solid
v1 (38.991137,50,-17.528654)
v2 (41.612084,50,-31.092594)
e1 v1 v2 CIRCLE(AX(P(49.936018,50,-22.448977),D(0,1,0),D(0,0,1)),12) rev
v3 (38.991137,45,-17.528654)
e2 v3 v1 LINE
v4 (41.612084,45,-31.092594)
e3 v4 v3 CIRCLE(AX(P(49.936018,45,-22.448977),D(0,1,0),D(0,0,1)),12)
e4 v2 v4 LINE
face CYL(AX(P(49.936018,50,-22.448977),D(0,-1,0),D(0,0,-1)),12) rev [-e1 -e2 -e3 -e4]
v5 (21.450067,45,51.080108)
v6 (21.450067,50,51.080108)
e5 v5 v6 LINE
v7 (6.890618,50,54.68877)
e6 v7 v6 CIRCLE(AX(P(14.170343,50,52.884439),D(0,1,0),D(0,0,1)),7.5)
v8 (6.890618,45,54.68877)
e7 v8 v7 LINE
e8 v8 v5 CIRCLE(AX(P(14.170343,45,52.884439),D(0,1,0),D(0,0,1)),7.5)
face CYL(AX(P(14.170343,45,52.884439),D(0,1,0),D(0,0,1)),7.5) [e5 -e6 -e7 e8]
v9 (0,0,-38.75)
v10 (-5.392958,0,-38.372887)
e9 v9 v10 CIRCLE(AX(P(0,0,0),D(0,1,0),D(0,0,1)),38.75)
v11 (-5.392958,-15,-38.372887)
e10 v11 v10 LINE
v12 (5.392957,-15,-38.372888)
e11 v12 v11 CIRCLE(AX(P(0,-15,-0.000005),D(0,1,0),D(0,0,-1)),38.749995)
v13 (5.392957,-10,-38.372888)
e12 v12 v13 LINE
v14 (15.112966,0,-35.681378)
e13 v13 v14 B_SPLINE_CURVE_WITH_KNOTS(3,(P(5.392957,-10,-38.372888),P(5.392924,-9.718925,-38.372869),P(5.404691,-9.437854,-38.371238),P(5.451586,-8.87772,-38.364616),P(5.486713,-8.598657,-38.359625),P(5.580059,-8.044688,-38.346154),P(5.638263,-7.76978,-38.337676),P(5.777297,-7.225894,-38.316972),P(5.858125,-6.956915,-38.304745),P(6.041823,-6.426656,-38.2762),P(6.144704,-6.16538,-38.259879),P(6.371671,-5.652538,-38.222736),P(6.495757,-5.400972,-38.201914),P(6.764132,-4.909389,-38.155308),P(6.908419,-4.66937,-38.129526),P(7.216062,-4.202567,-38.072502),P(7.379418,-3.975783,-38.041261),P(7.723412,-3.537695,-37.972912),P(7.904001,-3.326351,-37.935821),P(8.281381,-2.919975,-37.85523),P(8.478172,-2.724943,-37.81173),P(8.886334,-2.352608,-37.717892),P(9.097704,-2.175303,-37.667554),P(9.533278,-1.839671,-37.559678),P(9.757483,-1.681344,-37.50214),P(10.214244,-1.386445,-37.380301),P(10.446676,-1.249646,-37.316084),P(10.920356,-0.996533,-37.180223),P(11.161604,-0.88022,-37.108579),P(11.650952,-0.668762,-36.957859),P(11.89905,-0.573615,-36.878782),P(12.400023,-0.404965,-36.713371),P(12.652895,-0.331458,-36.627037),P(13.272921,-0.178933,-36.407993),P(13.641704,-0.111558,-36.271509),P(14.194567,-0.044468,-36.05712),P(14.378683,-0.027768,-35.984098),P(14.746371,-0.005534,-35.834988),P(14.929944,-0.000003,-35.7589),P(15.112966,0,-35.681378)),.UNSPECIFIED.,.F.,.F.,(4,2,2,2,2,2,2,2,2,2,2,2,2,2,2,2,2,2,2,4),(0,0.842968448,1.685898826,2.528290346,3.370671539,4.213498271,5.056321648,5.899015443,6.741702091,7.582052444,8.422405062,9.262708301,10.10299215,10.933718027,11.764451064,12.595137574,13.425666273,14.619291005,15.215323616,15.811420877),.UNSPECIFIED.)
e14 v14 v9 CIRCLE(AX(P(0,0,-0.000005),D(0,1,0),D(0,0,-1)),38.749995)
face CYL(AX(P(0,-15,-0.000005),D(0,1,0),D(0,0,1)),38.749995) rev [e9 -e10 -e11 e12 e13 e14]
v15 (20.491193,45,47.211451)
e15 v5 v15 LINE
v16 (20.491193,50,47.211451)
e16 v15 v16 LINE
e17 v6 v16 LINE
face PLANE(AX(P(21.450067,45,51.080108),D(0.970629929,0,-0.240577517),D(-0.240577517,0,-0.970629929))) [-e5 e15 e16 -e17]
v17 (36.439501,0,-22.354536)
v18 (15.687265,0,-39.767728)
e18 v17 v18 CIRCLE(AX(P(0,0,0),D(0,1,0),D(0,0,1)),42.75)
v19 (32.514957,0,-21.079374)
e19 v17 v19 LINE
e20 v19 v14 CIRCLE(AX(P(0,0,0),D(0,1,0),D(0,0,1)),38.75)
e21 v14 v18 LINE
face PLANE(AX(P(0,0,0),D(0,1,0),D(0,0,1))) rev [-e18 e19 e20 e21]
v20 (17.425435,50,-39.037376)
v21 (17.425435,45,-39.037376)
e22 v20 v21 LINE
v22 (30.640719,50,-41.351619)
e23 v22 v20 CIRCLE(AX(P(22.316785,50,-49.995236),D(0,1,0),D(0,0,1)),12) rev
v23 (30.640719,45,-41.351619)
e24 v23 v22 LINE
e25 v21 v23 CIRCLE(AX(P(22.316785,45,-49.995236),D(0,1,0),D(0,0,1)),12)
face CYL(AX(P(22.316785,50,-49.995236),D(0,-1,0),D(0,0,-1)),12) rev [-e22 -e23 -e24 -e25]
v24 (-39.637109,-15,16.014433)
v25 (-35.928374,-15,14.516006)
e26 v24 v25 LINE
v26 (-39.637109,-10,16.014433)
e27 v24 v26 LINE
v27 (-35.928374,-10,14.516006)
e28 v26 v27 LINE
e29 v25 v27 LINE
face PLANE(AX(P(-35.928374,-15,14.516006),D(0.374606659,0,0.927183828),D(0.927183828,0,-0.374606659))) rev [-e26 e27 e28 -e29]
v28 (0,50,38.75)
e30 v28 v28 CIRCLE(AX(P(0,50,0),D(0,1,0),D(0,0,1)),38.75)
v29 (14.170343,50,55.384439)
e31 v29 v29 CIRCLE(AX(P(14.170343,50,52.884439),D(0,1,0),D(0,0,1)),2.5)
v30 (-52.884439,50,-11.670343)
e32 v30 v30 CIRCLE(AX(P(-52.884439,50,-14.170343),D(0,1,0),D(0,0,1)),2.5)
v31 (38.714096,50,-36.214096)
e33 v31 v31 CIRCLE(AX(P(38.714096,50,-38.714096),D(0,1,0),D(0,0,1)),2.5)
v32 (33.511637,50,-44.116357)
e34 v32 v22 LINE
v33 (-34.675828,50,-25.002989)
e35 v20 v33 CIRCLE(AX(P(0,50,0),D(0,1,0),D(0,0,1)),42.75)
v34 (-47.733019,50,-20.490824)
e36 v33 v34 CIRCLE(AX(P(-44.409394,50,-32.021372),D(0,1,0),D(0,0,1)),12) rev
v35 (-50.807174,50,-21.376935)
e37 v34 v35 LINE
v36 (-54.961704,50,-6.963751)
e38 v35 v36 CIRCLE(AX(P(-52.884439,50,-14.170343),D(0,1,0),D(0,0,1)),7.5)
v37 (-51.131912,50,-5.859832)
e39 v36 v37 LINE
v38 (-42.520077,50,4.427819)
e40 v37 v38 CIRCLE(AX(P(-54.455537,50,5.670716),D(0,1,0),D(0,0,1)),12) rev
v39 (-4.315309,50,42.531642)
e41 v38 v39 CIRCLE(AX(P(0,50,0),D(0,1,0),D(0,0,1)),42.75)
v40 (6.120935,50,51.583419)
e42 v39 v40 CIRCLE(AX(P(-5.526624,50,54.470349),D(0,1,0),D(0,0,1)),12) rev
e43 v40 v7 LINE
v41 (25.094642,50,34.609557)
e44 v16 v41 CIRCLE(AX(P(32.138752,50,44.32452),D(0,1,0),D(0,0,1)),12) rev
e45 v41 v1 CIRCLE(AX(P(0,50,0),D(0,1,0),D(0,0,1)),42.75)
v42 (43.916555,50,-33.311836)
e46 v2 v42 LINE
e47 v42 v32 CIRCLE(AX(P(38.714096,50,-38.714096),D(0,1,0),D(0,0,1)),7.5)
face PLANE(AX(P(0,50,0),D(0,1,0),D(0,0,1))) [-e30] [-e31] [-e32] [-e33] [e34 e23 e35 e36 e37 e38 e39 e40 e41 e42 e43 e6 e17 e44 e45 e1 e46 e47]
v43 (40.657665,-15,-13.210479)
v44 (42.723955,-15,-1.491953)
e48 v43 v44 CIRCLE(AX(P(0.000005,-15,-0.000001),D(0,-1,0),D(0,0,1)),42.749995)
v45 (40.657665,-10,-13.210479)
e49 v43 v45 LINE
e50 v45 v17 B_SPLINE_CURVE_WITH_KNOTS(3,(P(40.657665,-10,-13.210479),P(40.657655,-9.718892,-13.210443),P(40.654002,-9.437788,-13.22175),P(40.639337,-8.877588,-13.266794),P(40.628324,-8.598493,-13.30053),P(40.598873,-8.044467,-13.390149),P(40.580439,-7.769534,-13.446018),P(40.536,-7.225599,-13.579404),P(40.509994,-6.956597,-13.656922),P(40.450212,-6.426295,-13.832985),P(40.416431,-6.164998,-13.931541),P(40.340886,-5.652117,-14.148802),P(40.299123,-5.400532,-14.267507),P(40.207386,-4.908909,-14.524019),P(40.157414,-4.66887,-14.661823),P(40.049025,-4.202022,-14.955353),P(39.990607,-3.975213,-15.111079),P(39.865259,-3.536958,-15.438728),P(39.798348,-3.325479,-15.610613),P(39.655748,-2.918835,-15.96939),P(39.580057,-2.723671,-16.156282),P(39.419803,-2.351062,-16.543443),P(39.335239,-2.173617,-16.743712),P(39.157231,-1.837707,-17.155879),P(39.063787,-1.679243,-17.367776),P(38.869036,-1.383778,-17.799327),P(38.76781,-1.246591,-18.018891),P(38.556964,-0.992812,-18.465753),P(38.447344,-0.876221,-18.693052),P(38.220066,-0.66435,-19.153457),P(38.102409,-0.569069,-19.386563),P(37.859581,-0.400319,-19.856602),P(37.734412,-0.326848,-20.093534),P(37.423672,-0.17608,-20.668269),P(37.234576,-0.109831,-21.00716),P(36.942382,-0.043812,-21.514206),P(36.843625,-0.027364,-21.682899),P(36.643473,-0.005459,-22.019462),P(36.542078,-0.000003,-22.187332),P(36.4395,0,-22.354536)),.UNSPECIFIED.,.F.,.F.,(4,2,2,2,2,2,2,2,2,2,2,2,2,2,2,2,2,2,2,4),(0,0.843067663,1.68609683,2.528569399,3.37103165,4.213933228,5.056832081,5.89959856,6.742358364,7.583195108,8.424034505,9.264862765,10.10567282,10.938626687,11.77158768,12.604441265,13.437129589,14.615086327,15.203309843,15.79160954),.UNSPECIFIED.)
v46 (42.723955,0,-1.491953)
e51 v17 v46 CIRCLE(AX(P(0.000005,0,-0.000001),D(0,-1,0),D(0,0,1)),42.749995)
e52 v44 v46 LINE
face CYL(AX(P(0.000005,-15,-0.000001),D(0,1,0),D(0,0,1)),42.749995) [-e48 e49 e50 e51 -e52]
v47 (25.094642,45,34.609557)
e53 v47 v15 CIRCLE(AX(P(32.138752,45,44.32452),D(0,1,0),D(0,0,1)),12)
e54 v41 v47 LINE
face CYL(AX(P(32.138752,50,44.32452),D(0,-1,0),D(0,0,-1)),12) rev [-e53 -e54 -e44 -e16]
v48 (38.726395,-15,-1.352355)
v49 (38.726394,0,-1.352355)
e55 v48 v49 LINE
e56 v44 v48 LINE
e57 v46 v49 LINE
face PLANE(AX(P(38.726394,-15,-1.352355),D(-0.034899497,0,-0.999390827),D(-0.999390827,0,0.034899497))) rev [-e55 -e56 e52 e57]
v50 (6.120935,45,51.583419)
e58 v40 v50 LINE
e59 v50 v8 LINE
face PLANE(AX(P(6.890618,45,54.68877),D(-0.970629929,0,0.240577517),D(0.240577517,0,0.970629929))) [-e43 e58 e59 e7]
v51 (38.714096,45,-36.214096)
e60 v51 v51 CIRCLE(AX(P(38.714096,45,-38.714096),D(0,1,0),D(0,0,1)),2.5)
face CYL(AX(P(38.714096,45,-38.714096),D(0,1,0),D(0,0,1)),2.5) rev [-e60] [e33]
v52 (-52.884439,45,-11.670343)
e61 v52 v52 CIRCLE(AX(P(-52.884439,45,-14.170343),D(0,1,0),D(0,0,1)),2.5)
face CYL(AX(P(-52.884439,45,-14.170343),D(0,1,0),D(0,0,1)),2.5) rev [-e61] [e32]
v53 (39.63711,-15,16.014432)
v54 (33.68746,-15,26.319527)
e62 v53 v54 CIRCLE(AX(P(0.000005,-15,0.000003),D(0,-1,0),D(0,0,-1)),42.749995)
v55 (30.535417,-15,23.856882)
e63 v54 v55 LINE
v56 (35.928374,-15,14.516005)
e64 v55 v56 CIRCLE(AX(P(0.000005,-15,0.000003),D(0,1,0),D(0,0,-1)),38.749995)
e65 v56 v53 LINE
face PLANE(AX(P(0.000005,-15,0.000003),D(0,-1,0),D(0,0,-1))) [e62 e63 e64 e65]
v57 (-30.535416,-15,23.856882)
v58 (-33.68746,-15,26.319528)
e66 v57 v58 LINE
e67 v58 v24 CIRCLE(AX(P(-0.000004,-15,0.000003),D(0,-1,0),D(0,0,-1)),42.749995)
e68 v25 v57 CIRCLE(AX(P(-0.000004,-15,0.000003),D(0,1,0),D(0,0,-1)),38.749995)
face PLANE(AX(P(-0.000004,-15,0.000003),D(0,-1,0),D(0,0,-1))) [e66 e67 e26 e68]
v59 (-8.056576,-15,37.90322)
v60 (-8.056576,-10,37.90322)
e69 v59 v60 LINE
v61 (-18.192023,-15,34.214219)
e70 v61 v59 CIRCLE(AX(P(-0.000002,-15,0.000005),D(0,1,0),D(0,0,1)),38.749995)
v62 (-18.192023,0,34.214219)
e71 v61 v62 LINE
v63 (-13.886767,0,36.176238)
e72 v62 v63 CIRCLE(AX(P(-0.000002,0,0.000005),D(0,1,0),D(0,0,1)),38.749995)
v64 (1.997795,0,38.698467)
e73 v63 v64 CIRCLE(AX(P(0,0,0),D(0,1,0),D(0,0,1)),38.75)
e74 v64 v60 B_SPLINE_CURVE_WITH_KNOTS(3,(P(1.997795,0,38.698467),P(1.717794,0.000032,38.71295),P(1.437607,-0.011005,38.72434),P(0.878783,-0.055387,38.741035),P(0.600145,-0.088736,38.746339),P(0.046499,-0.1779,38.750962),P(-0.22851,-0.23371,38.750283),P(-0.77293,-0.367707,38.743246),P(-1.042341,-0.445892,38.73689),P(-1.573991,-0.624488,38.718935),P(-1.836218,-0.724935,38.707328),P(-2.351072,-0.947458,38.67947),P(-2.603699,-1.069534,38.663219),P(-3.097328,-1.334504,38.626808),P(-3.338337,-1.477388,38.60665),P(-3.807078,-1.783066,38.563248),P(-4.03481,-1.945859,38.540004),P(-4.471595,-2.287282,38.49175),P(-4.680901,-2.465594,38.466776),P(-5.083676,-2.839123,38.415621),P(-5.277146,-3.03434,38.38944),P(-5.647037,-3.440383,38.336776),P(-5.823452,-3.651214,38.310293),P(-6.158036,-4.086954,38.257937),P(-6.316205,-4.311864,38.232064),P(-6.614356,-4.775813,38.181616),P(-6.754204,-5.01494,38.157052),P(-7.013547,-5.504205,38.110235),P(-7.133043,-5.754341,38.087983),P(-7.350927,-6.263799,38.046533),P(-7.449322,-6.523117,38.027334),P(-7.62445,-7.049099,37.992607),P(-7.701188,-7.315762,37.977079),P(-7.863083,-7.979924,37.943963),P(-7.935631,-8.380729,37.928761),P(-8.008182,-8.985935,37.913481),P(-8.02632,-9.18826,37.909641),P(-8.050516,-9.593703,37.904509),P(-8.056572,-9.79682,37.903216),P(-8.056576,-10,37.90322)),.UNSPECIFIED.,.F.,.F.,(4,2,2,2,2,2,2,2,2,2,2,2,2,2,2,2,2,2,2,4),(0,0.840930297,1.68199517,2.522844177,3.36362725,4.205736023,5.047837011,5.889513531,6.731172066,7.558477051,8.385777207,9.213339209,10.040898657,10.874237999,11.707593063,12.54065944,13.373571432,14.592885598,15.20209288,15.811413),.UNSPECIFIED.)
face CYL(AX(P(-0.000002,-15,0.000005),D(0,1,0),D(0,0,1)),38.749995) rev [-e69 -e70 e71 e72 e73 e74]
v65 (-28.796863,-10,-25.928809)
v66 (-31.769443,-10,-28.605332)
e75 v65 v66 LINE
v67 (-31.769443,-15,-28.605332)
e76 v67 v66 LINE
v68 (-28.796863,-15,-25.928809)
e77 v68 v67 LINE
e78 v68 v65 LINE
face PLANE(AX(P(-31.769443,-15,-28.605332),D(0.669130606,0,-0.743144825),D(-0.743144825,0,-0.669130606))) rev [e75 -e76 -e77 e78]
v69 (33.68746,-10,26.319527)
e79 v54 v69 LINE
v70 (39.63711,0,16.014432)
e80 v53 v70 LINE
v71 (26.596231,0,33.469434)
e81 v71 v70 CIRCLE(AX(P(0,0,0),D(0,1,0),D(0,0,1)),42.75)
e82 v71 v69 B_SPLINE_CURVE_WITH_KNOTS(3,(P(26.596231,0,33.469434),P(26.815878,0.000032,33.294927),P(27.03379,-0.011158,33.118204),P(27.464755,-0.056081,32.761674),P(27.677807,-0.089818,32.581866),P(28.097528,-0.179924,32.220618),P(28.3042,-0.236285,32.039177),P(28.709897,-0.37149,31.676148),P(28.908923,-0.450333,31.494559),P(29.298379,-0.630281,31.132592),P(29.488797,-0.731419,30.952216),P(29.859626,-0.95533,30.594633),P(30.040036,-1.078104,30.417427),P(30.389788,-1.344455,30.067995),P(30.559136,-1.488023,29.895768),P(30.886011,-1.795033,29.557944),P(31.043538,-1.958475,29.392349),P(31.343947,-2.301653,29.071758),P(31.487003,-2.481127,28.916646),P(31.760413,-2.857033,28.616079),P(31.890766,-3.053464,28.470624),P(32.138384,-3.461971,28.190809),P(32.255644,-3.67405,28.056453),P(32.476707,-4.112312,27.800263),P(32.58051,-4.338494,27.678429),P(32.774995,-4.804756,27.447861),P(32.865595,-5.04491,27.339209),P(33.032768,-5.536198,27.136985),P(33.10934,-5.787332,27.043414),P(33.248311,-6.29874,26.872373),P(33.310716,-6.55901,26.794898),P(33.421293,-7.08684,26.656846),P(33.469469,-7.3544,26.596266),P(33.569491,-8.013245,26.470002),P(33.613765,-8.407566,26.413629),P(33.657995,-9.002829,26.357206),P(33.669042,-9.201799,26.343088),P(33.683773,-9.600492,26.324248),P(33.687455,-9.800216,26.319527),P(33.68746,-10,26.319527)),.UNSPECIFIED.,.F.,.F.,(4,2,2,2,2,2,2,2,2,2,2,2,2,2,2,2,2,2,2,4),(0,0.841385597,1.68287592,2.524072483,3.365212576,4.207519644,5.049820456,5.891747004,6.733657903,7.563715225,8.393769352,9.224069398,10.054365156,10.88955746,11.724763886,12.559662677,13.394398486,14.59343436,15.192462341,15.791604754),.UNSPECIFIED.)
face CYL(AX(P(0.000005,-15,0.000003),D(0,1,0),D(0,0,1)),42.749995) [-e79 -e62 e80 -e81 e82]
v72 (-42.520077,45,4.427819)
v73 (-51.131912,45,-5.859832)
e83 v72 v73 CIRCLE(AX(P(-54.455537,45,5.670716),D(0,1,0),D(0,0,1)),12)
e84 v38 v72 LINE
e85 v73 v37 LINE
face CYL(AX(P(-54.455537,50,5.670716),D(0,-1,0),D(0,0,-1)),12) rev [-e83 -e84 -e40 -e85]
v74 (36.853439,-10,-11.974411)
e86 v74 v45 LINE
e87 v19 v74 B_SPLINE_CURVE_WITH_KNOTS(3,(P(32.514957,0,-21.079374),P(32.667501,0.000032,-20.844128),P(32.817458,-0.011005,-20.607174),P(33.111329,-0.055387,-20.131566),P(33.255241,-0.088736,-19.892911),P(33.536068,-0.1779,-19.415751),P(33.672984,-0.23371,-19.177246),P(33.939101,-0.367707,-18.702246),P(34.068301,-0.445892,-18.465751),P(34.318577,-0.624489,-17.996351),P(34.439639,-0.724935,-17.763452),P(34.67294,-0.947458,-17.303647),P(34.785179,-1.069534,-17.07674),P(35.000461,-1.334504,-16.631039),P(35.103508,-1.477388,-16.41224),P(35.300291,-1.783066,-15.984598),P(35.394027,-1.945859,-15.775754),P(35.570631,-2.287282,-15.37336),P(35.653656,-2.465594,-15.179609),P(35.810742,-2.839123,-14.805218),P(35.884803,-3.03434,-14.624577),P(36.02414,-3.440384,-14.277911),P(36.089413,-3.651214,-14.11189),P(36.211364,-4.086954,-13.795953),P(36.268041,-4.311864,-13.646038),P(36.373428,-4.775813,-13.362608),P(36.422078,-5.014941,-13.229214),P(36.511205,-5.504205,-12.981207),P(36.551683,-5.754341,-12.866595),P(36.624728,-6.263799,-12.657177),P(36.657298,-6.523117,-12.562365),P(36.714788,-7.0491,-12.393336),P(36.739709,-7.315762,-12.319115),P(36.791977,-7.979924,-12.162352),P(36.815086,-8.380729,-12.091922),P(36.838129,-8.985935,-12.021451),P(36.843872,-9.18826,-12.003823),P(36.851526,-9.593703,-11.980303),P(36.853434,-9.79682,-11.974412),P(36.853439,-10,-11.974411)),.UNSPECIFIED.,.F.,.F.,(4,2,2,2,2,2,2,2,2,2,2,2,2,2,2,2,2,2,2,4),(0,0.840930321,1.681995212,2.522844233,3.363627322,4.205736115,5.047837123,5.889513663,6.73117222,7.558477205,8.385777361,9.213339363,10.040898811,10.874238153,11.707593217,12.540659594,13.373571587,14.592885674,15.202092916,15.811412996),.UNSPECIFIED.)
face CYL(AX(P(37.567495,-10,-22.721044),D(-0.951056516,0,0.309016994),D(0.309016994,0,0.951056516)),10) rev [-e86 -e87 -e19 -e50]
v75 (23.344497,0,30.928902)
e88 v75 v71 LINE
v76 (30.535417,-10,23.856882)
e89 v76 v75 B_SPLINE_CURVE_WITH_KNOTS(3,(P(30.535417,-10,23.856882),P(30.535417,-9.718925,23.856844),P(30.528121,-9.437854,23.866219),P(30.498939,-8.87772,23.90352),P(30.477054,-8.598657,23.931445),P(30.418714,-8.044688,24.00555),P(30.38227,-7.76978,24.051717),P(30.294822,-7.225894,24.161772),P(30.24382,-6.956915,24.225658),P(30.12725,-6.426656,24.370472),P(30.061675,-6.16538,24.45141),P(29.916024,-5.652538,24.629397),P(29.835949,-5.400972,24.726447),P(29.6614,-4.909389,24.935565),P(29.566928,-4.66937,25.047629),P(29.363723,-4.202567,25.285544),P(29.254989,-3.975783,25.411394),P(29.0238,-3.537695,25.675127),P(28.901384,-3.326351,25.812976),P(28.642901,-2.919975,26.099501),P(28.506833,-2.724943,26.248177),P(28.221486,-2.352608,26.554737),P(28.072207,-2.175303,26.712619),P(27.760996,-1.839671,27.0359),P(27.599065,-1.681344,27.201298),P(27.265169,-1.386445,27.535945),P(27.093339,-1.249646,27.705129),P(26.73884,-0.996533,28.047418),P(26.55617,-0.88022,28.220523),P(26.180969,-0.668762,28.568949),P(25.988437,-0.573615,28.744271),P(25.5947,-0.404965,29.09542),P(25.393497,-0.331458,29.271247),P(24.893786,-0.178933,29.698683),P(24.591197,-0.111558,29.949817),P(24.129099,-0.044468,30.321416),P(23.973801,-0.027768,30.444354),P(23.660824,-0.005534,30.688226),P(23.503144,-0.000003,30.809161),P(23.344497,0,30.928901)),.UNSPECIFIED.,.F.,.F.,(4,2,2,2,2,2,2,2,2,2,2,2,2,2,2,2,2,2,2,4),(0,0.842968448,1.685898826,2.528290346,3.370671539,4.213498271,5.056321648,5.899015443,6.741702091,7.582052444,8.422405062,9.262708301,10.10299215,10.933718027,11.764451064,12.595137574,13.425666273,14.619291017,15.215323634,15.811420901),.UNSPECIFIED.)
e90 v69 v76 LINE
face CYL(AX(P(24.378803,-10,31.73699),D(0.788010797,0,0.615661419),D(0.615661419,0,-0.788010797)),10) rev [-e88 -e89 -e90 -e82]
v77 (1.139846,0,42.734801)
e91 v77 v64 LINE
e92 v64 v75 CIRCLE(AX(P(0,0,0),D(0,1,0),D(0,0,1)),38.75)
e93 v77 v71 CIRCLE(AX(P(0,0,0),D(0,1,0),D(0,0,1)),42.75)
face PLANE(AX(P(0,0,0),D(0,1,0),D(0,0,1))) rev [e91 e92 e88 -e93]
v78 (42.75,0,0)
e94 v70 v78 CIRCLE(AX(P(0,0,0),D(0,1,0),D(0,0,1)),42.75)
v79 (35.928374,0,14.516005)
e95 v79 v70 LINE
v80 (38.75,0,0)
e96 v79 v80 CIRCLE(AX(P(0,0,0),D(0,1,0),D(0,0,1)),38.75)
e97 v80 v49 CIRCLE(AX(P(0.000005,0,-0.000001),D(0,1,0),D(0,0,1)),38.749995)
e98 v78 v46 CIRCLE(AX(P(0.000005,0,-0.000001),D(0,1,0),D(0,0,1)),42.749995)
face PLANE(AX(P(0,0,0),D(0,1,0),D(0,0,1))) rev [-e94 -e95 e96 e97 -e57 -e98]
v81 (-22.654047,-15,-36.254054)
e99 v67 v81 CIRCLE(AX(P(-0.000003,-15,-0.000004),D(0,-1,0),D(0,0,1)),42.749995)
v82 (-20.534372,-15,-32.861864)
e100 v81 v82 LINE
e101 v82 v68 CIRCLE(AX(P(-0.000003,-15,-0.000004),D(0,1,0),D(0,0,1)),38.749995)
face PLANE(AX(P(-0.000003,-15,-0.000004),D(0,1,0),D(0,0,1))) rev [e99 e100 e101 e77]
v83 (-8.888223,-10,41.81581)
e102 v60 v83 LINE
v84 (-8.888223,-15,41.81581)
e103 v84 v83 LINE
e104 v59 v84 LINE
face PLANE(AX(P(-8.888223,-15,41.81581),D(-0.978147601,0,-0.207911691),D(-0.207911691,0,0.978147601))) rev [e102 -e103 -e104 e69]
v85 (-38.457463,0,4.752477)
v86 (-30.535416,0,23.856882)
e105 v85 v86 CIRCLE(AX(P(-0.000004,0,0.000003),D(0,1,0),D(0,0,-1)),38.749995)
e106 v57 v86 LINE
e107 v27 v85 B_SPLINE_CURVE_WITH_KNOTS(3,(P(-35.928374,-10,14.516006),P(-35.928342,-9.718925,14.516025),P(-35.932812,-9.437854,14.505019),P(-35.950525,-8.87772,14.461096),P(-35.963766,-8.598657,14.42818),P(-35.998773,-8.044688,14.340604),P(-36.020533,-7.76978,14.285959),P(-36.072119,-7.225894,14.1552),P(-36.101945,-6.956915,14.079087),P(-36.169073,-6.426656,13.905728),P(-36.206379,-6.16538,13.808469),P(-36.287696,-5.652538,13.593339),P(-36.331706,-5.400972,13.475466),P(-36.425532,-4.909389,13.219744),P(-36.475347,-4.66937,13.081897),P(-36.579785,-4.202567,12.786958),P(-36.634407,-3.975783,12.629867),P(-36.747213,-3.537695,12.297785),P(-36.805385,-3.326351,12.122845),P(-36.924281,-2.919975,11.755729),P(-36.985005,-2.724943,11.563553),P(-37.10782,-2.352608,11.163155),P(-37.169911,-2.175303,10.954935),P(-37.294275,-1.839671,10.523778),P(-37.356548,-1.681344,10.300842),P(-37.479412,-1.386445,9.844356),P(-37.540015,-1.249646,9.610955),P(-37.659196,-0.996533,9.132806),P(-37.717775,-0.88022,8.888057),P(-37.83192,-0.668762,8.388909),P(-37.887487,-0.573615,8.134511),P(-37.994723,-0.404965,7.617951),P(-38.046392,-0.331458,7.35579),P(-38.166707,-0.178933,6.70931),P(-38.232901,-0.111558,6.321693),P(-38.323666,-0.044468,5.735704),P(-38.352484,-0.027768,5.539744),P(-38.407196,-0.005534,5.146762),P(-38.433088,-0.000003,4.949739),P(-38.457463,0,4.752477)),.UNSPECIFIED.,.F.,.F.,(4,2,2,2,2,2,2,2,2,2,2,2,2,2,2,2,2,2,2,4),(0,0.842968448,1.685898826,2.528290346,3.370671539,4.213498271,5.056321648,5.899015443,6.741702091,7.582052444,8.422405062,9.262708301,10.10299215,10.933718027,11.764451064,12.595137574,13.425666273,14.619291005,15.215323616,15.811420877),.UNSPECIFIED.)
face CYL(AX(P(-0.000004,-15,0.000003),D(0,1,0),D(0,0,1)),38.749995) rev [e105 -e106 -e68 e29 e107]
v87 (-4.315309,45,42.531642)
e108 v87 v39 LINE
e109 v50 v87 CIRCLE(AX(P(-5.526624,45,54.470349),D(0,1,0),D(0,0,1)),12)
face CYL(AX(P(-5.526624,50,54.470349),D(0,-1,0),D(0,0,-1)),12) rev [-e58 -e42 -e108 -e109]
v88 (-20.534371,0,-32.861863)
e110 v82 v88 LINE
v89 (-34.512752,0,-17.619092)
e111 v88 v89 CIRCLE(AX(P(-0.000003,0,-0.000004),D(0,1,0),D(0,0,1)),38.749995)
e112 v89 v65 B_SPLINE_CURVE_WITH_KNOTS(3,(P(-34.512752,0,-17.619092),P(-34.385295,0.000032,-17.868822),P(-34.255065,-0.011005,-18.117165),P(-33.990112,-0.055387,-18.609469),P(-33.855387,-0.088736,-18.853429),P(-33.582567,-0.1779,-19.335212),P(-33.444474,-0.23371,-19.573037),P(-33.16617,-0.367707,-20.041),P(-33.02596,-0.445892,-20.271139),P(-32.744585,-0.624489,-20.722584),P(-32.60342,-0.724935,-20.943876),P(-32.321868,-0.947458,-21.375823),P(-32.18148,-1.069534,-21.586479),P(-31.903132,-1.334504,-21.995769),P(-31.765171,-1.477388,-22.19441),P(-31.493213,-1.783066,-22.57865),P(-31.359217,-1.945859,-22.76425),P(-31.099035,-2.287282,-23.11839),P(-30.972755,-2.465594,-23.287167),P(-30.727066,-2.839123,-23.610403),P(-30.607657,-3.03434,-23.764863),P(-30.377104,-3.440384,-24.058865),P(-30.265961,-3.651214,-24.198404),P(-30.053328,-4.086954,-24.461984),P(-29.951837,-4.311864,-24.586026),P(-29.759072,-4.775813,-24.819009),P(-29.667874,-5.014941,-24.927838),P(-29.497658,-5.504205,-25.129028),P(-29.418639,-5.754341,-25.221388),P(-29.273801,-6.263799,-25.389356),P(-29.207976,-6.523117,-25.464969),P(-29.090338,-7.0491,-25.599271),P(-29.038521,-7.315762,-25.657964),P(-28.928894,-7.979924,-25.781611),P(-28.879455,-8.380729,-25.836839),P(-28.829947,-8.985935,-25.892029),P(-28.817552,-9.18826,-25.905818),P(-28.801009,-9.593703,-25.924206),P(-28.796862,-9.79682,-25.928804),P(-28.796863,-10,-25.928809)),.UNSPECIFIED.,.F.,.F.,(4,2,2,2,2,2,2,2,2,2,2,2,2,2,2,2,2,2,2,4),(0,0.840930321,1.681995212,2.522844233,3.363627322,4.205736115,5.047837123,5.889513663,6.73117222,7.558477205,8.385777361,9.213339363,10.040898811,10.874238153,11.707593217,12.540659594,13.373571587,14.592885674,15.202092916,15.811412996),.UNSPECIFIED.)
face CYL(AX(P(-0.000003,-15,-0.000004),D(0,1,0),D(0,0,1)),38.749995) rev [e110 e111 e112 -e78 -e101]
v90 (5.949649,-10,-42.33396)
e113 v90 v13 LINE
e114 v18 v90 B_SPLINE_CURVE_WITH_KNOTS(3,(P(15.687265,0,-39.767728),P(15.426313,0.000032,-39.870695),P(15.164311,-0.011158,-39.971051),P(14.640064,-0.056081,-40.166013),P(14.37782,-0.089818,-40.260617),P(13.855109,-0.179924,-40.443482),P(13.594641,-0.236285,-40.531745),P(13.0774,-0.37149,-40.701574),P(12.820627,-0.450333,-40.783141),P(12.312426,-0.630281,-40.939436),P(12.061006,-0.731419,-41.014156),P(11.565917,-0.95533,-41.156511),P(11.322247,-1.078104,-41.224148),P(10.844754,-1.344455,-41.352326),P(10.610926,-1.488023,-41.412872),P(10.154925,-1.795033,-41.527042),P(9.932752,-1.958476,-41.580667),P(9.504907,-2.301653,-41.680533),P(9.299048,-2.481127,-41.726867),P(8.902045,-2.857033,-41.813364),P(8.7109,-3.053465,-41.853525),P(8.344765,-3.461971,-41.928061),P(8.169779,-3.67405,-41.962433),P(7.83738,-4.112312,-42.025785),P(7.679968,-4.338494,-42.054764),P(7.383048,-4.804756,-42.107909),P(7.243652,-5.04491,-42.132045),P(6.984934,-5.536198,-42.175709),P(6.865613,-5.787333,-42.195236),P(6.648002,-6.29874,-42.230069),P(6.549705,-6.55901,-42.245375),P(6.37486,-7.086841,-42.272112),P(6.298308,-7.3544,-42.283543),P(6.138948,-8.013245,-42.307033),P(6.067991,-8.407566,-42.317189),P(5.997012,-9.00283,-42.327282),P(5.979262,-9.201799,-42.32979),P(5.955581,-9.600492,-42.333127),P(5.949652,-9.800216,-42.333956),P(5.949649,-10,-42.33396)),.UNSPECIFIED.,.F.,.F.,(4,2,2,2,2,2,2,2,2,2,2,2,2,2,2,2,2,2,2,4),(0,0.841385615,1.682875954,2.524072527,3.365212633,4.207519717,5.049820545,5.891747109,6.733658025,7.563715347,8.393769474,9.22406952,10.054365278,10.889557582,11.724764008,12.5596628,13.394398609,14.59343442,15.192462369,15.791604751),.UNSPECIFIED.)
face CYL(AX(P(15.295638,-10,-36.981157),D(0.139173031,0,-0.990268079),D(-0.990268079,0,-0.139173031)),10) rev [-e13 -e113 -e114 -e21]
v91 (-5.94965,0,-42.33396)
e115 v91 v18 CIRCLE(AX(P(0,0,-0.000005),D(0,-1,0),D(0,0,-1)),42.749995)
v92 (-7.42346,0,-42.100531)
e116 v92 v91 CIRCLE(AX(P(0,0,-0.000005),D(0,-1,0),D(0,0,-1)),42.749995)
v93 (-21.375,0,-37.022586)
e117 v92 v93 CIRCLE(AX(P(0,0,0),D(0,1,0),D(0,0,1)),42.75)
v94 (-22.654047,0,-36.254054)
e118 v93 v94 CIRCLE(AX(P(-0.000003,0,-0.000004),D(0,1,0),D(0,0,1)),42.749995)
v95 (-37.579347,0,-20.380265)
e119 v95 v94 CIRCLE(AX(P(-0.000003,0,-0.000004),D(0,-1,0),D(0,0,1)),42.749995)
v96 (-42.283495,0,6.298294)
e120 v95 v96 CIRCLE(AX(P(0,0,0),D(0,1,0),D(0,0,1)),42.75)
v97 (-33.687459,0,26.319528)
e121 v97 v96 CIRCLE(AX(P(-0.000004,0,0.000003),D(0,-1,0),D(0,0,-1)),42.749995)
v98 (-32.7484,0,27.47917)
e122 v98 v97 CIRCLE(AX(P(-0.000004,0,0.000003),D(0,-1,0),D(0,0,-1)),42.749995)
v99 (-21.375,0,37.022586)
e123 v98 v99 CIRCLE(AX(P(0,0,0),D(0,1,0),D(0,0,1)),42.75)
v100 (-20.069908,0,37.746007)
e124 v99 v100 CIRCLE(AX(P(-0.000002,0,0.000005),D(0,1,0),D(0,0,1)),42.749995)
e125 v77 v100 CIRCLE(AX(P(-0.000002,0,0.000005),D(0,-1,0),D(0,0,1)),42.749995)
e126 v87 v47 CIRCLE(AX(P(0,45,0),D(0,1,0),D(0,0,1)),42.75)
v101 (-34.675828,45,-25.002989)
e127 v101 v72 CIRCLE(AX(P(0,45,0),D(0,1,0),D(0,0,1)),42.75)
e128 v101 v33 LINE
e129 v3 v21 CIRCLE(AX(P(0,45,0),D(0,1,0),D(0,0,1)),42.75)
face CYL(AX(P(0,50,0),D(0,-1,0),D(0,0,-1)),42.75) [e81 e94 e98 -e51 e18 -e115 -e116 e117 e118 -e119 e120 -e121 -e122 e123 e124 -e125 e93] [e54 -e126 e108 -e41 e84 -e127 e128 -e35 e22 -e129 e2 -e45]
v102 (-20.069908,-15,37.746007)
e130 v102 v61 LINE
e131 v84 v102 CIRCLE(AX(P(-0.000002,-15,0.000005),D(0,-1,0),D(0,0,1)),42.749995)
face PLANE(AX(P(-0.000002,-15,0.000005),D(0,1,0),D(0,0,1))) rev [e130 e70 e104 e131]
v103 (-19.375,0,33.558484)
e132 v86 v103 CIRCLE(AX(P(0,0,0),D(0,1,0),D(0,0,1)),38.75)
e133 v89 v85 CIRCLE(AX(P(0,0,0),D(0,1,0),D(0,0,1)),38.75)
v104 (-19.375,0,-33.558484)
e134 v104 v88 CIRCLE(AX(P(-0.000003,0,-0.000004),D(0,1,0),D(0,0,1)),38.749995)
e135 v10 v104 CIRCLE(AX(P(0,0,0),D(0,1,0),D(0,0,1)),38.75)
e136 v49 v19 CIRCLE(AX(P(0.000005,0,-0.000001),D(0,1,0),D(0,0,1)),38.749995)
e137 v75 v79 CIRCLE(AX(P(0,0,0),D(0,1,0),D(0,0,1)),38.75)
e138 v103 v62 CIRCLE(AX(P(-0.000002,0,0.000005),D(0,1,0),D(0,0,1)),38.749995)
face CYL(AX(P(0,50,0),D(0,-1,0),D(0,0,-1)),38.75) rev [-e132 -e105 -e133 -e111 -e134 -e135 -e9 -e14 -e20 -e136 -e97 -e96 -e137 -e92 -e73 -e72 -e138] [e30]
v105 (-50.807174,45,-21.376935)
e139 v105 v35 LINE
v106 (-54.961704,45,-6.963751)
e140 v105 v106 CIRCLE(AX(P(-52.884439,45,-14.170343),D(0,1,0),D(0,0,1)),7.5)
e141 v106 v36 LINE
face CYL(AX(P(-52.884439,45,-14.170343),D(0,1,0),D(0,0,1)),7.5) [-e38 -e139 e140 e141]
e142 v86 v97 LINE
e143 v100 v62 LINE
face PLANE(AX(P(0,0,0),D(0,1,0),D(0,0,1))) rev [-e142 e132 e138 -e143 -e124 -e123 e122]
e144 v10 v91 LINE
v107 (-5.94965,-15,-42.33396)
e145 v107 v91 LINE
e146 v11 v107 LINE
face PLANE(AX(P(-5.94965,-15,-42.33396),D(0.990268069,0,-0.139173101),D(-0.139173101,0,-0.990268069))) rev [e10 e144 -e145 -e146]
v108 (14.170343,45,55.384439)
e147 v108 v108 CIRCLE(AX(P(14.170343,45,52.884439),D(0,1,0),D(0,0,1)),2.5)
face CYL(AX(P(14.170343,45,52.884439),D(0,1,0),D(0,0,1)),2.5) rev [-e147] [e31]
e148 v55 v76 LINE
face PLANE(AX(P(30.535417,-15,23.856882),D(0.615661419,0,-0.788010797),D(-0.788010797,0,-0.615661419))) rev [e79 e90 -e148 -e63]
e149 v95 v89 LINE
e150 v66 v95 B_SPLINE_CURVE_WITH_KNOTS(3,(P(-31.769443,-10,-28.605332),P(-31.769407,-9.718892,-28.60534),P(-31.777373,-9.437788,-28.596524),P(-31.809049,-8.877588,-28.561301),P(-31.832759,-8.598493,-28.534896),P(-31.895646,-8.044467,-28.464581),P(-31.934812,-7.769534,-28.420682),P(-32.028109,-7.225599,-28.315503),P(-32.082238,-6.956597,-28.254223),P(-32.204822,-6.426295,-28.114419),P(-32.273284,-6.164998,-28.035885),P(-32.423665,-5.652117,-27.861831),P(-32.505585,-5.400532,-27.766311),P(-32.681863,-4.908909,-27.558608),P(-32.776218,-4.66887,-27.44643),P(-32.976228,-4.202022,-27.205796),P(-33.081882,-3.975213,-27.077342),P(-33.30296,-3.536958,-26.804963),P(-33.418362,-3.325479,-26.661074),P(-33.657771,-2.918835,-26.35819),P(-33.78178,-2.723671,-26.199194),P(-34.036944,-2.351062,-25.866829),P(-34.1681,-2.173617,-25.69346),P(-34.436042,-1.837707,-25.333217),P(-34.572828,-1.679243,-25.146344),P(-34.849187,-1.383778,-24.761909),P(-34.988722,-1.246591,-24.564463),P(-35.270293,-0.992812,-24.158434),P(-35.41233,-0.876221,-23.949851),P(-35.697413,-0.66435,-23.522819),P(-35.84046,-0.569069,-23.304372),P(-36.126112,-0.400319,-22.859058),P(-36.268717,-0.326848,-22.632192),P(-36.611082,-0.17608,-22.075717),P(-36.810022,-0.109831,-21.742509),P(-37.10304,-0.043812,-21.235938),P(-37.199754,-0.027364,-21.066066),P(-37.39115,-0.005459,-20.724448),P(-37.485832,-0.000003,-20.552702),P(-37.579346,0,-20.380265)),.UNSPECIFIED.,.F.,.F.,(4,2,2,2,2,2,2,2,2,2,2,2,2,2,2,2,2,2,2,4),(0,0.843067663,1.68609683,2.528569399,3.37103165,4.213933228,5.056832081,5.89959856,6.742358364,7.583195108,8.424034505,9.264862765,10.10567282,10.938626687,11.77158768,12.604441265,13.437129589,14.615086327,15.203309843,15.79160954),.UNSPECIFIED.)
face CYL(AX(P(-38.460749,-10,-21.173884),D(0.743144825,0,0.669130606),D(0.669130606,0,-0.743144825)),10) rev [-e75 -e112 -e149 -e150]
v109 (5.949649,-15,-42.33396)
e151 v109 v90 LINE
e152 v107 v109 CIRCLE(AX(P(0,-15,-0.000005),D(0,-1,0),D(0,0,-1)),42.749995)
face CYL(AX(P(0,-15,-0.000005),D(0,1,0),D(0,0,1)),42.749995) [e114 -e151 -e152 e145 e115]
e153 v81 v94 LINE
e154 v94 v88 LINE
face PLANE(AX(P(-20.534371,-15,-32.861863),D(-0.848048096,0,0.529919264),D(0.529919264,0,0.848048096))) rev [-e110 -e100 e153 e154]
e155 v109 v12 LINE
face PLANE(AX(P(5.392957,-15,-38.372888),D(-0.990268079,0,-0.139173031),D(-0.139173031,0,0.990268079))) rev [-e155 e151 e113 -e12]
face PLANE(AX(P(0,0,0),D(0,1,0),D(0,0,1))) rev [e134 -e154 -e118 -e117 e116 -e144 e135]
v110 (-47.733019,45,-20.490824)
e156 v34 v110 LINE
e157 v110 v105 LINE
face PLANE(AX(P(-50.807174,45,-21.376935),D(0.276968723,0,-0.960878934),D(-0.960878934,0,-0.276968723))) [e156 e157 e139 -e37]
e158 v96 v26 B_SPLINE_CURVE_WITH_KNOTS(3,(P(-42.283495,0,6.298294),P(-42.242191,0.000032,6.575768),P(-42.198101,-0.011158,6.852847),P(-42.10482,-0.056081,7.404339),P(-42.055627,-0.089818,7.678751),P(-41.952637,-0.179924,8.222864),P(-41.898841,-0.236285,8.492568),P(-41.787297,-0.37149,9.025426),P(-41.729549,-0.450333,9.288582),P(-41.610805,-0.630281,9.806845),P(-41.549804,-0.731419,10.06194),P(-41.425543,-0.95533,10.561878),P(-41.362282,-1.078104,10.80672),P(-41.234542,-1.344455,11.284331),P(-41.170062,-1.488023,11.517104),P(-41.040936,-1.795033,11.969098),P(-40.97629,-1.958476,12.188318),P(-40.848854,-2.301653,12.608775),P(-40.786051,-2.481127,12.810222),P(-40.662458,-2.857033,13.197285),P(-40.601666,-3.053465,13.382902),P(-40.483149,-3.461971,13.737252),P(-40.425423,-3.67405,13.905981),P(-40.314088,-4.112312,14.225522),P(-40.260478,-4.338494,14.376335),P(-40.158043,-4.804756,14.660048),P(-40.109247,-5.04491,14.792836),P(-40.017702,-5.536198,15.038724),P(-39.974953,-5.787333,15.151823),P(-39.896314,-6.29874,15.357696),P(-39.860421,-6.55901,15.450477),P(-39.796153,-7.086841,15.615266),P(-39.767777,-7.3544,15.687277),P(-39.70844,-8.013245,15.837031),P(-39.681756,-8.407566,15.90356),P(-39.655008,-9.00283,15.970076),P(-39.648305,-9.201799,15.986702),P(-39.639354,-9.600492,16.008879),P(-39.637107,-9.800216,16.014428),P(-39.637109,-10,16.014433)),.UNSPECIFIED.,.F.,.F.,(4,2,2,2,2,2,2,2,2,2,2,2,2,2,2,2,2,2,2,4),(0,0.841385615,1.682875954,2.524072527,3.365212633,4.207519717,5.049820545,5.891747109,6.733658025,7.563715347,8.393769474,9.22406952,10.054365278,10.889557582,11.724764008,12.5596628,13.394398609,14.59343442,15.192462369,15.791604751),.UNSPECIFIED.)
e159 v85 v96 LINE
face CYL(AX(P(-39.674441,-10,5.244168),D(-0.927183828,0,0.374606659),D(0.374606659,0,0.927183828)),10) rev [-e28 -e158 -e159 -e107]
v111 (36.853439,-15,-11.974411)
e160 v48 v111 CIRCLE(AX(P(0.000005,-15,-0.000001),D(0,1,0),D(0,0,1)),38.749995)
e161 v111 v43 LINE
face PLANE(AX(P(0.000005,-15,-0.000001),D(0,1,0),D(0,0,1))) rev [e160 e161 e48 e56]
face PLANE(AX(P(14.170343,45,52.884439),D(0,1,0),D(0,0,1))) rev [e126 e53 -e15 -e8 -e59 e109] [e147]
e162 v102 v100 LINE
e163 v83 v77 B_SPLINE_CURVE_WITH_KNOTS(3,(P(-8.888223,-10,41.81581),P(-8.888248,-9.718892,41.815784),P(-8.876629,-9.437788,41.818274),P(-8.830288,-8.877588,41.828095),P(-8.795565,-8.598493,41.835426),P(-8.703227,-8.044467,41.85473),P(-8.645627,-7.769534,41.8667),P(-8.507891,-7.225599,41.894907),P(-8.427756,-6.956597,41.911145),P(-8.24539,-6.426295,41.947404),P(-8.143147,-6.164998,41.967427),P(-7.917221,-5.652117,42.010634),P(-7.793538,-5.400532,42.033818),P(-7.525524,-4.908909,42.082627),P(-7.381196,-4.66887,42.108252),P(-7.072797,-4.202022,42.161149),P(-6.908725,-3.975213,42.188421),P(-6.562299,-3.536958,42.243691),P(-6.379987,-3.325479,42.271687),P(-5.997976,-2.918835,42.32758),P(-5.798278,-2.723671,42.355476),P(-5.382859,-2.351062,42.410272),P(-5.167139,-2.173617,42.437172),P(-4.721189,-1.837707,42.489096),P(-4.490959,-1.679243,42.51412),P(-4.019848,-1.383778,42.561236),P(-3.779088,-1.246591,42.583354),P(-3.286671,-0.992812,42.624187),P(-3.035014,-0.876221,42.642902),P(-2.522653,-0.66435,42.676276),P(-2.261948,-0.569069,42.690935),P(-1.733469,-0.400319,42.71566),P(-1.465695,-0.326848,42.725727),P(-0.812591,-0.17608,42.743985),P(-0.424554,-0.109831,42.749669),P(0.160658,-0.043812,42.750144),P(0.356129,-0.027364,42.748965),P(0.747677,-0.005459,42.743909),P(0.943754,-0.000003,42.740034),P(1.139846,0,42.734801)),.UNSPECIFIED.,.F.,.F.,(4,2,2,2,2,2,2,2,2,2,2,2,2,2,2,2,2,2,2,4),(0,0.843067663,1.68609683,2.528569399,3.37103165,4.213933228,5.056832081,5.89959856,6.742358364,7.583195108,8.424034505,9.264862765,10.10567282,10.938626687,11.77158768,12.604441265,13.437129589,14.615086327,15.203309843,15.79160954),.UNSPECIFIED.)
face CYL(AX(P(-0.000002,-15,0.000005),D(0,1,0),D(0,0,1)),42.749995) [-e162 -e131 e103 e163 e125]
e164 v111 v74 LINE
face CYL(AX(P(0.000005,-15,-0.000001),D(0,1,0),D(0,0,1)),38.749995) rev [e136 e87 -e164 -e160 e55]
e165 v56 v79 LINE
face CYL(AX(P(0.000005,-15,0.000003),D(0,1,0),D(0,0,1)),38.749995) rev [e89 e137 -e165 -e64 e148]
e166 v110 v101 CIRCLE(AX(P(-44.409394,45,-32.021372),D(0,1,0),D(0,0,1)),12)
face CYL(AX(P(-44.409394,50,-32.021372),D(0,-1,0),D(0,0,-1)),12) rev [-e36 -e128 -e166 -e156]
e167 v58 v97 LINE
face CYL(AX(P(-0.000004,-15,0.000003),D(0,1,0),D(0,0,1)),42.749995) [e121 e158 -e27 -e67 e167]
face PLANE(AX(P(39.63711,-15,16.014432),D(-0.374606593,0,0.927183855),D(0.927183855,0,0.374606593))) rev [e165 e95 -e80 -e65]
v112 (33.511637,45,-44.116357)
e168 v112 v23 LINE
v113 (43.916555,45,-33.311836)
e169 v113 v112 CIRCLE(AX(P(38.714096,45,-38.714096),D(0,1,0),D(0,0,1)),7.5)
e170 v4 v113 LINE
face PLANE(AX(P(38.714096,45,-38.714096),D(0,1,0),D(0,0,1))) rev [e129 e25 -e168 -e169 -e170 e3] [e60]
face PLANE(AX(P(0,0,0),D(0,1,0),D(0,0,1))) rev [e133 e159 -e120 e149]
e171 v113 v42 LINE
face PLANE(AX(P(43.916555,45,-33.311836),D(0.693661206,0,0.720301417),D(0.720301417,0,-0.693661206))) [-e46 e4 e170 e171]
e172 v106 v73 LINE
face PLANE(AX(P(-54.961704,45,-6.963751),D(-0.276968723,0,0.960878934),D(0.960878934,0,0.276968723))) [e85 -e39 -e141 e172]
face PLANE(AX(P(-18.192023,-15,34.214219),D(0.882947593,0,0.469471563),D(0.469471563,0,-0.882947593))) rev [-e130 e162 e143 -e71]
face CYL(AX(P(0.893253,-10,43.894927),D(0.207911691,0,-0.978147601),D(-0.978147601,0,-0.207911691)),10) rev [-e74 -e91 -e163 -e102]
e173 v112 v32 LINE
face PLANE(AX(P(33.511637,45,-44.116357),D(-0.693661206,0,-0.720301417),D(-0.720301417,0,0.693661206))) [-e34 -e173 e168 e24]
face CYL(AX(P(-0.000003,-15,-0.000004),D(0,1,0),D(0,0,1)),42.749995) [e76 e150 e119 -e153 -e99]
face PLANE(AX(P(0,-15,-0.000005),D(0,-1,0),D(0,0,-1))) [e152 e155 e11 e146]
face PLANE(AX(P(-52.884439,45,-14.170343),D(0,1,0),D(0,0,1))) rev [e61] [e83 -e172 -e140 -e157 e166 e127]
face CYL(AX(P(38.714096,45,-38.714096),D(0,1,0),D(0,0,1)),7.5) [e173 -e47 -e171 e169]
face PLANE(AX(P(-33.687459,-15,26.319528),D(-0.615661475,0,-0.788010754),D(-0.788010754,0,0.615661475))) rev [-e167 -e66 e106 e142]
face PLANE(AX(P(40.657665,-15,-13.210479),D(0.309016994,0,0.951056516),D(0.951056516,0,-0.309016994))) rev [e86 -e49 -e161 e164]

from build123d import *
from build123d.topology import SkipClean

# Parameters (mm, degrees)
SKETCH1_R           = 42.74999999999999
SKETCH1_R_2         = 38.75
BOSS_EXTRUDE1_DEPTH = 50
BOSS_EXTRUDE3_DEPTH = 15
FILLET11_R          = 10
BOSS_EXTRUDE4_START = -5
SKETCH3_R           = 2.5000000000000027
SKETCH3_R_2         = 2.499999999995902
SKETCH3_R_3         = 2.499999999998028
BOSS_EXTRUDE4_DEPTH = 5
FILLET12_R          = 12
CUT_EXTRUDE1_DEPTH  = 99.95736932696003


with BuildPart() as part:
    # Sketch1 → Boss-Extrude1 (new body)
    with BuildSketch(Plane(origin=(0, 0, 0), x_dir=(1, 0, 0), z_dir=(0, 1, 0))):
        with Locations(Location((0, 0, 0), (0, 0, 270))):
            Circle(SKETCH1_R)
        with Locations(Location((0, 0, 0), (0, 0, 270))):
            Circle(SKETCH1_R_2, mode=Mode.SUBTRACT)
    extrude(amount=BOSS_EXTRUDE1_DEPTH)

    # Sketch2 → Boss-Extrude3 (add)
    with BuildSketch(Plane.XZ):
        with BuildLine():
            Line((38.75, 0), (42.74999999999999, 0))
            ThreePointArc((42.74999999999999, 0), (42.22367645063639, -6.68757448683748), (40.657665385647135, -13.210478620729493))
            Line((40.657665385647135, -13.210478620729493), (36.853439320466514, -11.974410643229694))
            ThreePointArc((36.853439320466514, -11.974410643229694), (38.272923088255865, -6.061836626676557), (38.75, 0))
        make_face()
        with BuildLine():
            Line((30.53541703259137, 23.856881746065003), (33.68746022219302, 26.319527423154156))
            ThreePointArc((33.68746022219302, 26.319527423154156), (37.3899927357603, 20.7256109377942), (40.17185953859756, 14.621361127172362))
            Line((40.17185953859756, 14.621361127172362), (36.41308905545394, 13.253280553869686))
            ThreePointArc((36.41308905545394, 13.253280553869686), (33.891513838231084, 18.78637258123708), (30.53541703259137, 23.856881746065003))
        make_face()
        with BuildLine():
            Line((-7.423459595259061, -42.10053144127372), (-6.728866884591348, -38.161300429224895))
            ThreePointArc((-6.728866884591348, -38.161300429224895), (-0.6762810188026127, -38.74409824724033), (5.392957130880042, -38.3728877384105))
            Line((5.392957130880042, -38.3728877384105), (5.949649252958357, -42.333960052975826))
            ThreePointArc((5.949649252958357, -42.333960052975826), (-0.7460907867955708, -42.74348902538298), (-7.423459595259061, -42.10053144127372))
        make_face()
        with BuildLine():
            Line((-31.769442774524343, -28.605331772174747), (-28.796863472614763, -25.92880934673931))
            ThreePointArc((-28.796863472614763, -25.92880934673931), (-24.386166056418613, -30.114405358181113), (-19.374999999997826, -33.558484396648836))
            Line((-19.374999999997826, -33.558484396648836), (-21.374999999997822, -37.022586011786586))
            ThreePointArc((-21.374999999997822, -37.022586011786586), (-26.90344762061796, -33.22298920400898), (-31.769442774524343, -28.605331772174747))
        make_face()
        with BuildLine():
            Line((-32.748399943336835, 27.479170314096717), (-29.68422217086093, 24.908019875350572))
            ThreePointArc((-29.68422217086093, 24.908019875350572), (-33.21523281942682, 19.95772566599861), (-35.92837416346974, 14.516005992340855))
            Line((-35.92837416346974, 14.516005992340855), (-39.63710947514971, 16.01443262981703))
            ThreePointArc((-39.63710947514971, 16.01443262981703), (-36.64390194896306, 22.017878087584137), (-32.748399943336835, 27.479170314096717))
        make_face()
        with BuildLine():
            Line((-8.888222611121137, 41.8158103928996), (-8.056575847850104, 37.90321998996437))
            ThreePointArc((-8.056575847850104, 37.90321998996437), (-13.886757031835588, 36.17624198485303), (-19.37500000000052, 33.5584843966442))
            Line((-19.37500000000052, 33.5584843966442), (-21.37500000000052, 37.02258601178195))
            ThreePointArc((-21.37500000000052, 37.02258601178195), (-15.320228830016775, 39.91056369084182), (-8.888222611121137, 41.8158103928996))
        make_face()
    extrude(amount=BOSS_EXTRUDE3_DEPTH)

    # Fillet11
    # the kernel refuses this fillet: 10 mm, written as the material it adds along each edge
    with BuildSketch(Plane(origin=(10.835147097581084, 0, 8.465346264257812), x_dir=(-0.6156614192722877, 0, 0.7880107974004115), z_dir=(0.7880107974004116, 0, 0.6156614192722877))) as fillet11_piece_1_section:
        with BuildLine():
            CenterArc((FILLET11_R, FILLET11_R), FILLET11_R, 180, 90)
            Line((-2.49e-15, FILLET11_R), (0, 0))
            Line((0, 0), (FILLET11_R, 0))
        make_face()
    fillet11_piece_1 = extrude(amount=54, mode=Mode.PRIVATE)
    fillet11_piece_1 = fillet11_piece_1 & Plane(origin=(4.59061190483e-06, -2.230126202783113, 2.54461775206e-06), x_dir=(0.7880107536067299, 0, 0.6156614753256483), z_dir=(0, 1, 0)) * Cylinder(42.749994815925334, 148, mode=Mode.PRIVATE)
    fillet11_piece_1 = fillet11_piece_1 - Plane(origin=(4.59061572045e-06, -2.230126202783113, 2.54461984817e-06), x_dir=(0.9396926280330065, 0, 0.34202012341443), z_dir=(0, 1, 0)) * Cylinder(38.74999481592104, 148, mode=Mode.PRIVATE)
    add(fillet11_piece_1)
    with BuildSketch(Plane(origin=(64.43407829302596, 0, -20.935903480103214), x_dir=(-0.3090169943749489, 0, -0.9510565162951531), z_dir=(-0.9510565162951531, 0, 0.3090169943749489))) as fillet11_piece_2_section:
        with BuildLine():
            CenterArc((FILLET11_R, FILLET11_R), FILLET11_R, 180, 90)
            Line((0, FILLET11_R), (0, 0))
            Line((0, 0), (FILLET11_R, 0))
        make_face()
    fillet11_piece_2 = extrude(amount=54, mode=Mode.PRIVATE)
    fillet11_piece_2 = fillet11_piece_2 & Plane(origin=(5.18407557237e-06, -2.2301270287975066, -8.21077077e-07), x_dir=(0.9999999999999999, 0, 1.920648366230405e-08), z_dir=(0, 1, 0)) * Cylinder(42.749994815924424, 148, mode=Mode.PRIVATE)
    fillet11_piece_2 = fillet11_piece_2 - Plane(origin=(5.18407759387e-06, -2.2301270287975066, -8.2107737676e-07), x_dir=(0.951056492044892, 0, -0.3090170690095685), z_dir=(0, 1, 0)) * Cylinder(38.74999481592241, 148, mode=Mode.PRIVATE)
    add(fillet11_piece_2)
    with BuildSketch(Plane(origin=(1.9136313678905688, 0, -13.616185772377186), x_dir=(0.9902680786413326, 0, 0.13917303051957894), z_dir=(0.13917303051957894, 0, -0.9902680786413326))) as fillet11_piece_3_section:
        with BuildLine():
            CenterArc((FILLET11_R, FILLET11_R), FILLET11_R, 180, 90)
            Line((-1.7e-15, FILLET11_R), (0, 0))
            Line((0, 0), (FILLET11_R, 0))
        make_face()
    fillet11_piece_3 = extrude(amount=53.99999999999999, mode=Mode.PRIVATE)
    fillet11_piece_3 = fillet11_piece_3 & Plane(origin=(-9.160021364e-08, -2.2301268177813673, -5.24789779632e-06), x_dir=(0.13917310096005606, 0, -0.9902680687415717), z_dir=(0, 1, 0)) * Cylinder(42.74999481592479, 148, mode=Mode.PRIVATE)
    fillet11_piece_3 = fillet11_piece_3 - Plane(origin=(-9.160024539e-08, -2.2301268177813673, -5.24790106127e-06), x_dir=(-0.1736481985341157, 0, -0.98480774933276), z_dir=(0, 1, 0)) * Cylinder(38.74999481592157, 148, mode=Mode.PRIVATE)
    add(fillet11_piece_3)
    with BuildSketch(Plane(origin=(-50.348063411459194, 0, -45.333596931146204), x_dir=(-0.6691306063588583, 0, 0.7431448254773941), z_dir=(0.7431448254773941, 0, 0.6691306063588583))) as fillet11_piece_4_section:
        with BuildLine():
            CenterArc((FILLET11_R, FILLET11_R), FILLET11_R, 180, 90)
            Line((0, FILLET11_R), (0, 0))
            Line((0, 0), (FILLET11_R, 0))
        make_face()
    fillet11_piece_4 = extrude(amount=54, mode=Mode.PRIVATE)
    fillet11_piece_4 = fillet11_piece_4 & Plane(origin=(-3.30310971641e-06, -2.2301270903644643, -4.07900507859e-06), x_dir=(-0.4999999833666949, 0, -0.8660254133876817), z_dir=(0, 1, 0)) * Cylinder(42.74999481592363, 148, mode=Mode.PRIVATE)
    fillet11_piece_4 = fillet11_piece_4 - Plane(origin=(-3.30311013208e-06, -2.2301270903644643, -4.07900559019e-06), x_dir=(-0.7431448779877398, 0, -0.6691305480402069), z_dir=(0, 1, 0)) * Cylinder(38.74999481592298, 148, mode=Mode.PRIVATE)
    add(fillet11_piece_4)
    with BuildSketch(Plane(origin=(-12.748778465469993, 0, 5.150839508114776), x_dir=(-0.37460665936904325, 0, -0.92718382791999), z_dir=(-0.9271838279199901, 0, 0.37460665936904325))) as fillet11_piece_5_section:
        with BuildLine():
            CenterArc((FILLET11_R, FILLET11_R), FILLET11_R, 180, 90)
            Line((-7e-16, FILLET11_R), (0, 0))
            Line((0, 0), (FILLET11_R, 0))
        make_face()
    fillet11_piece_5 = extrude(amount=54.000000000000014, mode=Mode.PRIVATE)
    fillet11_piece_5 = fillet11_piece_5 & Plane(origin=(-4.49901083854e-06, -2.230126003773029, 2.70327532093e-06), x_dir=(-0.9271838545667841, 0, 0.37460659341592023), z_dir=(0, 1, 0)) * Cylinder(42.74999481592445, 149, mode=Mode.PRIVATE)
    fillet11_piece_5 = fillet11_piece_5 - Plane(origin=(-4.49901406974e-06, -2.230126003773029, 2.70327729979e-06), x_dir=(-0.7660444294988882, 0, 0.64278762591833), z_dir=(0, 1, 0)) * Cylinder(38.749994815920715, 149, mode=Mode.PRIVATE)
    add(fillet11_piece_5)
    with BuildSketch(Plane(origin=(-14.08601488156509, 0, 66.26950041124476), x_dir=(0.9781476007338059, 0, 0.20791169081775793), z_dir=(0.20791169081775795, 0, -0.9781476007338059))) as fillet11_piece_6_section:
        with BuildLine():
            CenterArc((FILLET11_R, FILLET11_R), FILLET11_R, 180, 90)
            Line((0, FILLET11_R), (0, 0))
            Line((0, 0), (FILLET11_R, 0))
        make_face()
    fillet11_piece_6 = extrude(amount=54.00000000000003, mode=Mode.PRIVATE)
    fillet11_piece_6 = fillet11_piece_6 & Plane(origin=(-1.88096511966e-06, -2.2301273000285007, 4.90007795761e-06), x_dir=(-0.5000000166333063, 0, 0.8660253941811946), z_dir=(0, 1, 0)) * Cylinder(42.74999481592328, 149, mode=Mode.PRIVATE)
    fillet11_piece_6 = fillet11_piece_6 - Plane(origin=(-1.88096534792e-06, -2.2301273000285007, 4.90007855092e-06), x_dir=(-0.20791161405715206, 0, 0.9781476170497733), z_dir=(0, 1, 0)) * Cylinder(38.74999481592266, 149, mode=Mode.PRIVATE)
    add(fillet11_piece_6)

    # Sketch3 → Boss-Extrude4 (add)
    # profile 1 of 3: a face of its own
    with SkipClean():  # the faces are left unmerged after this step: merging them gives an invalid solid
        with BuildSketch(Plane(origin=(0, 50, 0), x_dir=(1, 0, 0), z_dir=(0, 1, 0)).offset(BOSS_EXTRUDE4_START)):
            with BuildLine():
                Line((33.511637227041675, 44.116356899248466), (21.30894025148576, 32.364974360543066))
                ThreePointArc((21.30894025148576, 32.364974360543066), (27.172199137767333, 27.626691695125434), (32.007081006023014, 21.842830985792126))
                Line((32.007081006023014, 21.842830985792126), (43.91655531288513, 33.311835640678616))
                ThreePointArc((43.91655531288513, 33.311835640678616), (44.11635689924832, 43.91655531288527), (33.511637227041675, 44.116356899248466))
            make_face()
            with Locations(Location((38.7140962699634, 38.71409626996354, 0), (0, 0, 270))):
                Circle(SKETCH3_R, mode=Mode.SUBTRACT)
        # profile 2 of 3: a face of its own
        with BuildSketch(Plane(origin=(0, 50, 0), x_dir=(1, 0, 0), z_dir=(0, 1, 0)).offset(BOSS_EXTRUDE4_START)):
            with BuildLine():
                Line((21.450067183648166, -51.08010761065472), (17.374419863318376, -34.636570765787056))
                ThreePointArc((17.374419863318376, -34.636570765787056), (10.33931726161448, -37.345160577562936), (2.912906021253314, -38.64036074510248))
                Line((2.912906021253314, -38.64036074510248), (6.890618255075937, -54.68877036800639))
                ThreePointArc((6.890618255075937, -54.68877036800639), (15.97467409803788, -60.16416345361666), (21.450067183648166, -51.08010761065472))
            make_face()
            with Locations(Location((14.170342719362047, -52.88443898933055, 0), (0, 0, 270))):
                Circle(SKETCH3_R_2, mode=Mode.SUBTRACT)
        # profile 3 of 3: a face of its own
        with BuildSketch(Plane(origin=(0, 50, 0), x_dir=(1, 0, 0), z_dir=(0, 1, 0)).offset(BOSS_EXTRUDE4_START)):
            with BuildLine():
                Line((-54.96170441069497, 6.963750711401009), (-38.68336011480927, 2.2715964052387614))
                ThreePointArc((-38.68336011480927, 2.2715964052387614), (-37.51151639938695, 9.718468882432287), (-34.919987027281465, 16.797529759305117))
                Line((-34.919987027281465, 16.797529759305117), (-50.8071735679662, 21.37693472732252))
                ThreePointArc((-50.8071735679662, 21.37693472732252), (-60.09103099729134, 16.247608140726154), (-54.96170441069497, 6.963750711401009))
            make_face()
            with Locations(Location((-52.88443898933059, 14.170342719361772, 0), (0, 0, 270))):
                Circle(SKETCH3_R_3, mode=Mode.SUBTRACT)
        extrude(amount=BOSS_EXTRUDE4_DEPTH)

    # Fillet12
    # the kernel refuses this fillet: 12 mm, written as the material it adds along each edge
    with BuildSketch(Plane(origin=(34.92538168322465, 50, -24.653198865077854), x_dir=(0.4956414180531426, 0, 0.868527250413175), z_dir=(0, -1, 0))) as fillet12_piece_1:
        with BuildLine():
            CenterArc((9.354319503247144, -11.944643415577572), FILLET12_R, 95.50552505302721, 70.28590162466685)
            Line((-2.2785840931773462, -8.999214089266344), (0, 0))
            ThreePointArc((0, 0), (4.101509320654527, -0.1972078320049116), (8.203018641309042, -2.9e-16))
        make_face()
    extrude(amount=5)
    with BuildSketch(Plane(origin=(24.255614002642524, 50, -35.202665941016626), x_dir=(-0.871971609840304, 0, -0.48955644376568963), z_dir=(0, -1, 0))) as fillet12_piece_2:
        with BuildLine():
            CenterArc((8.932402267564173, 11.949534715437375), FILLET12_R, 196.7679395306473, 67.9755723410264)
            Line((-2.5573706744403597, 8.487581835749301), (0, 0))
            ThreePointArc((0, 0), (3.916514840393532, 0.17978257625434443), (7.833029680787052, 1.1e-16))
        make_face()
    extrude(amount=5)
    with BuildSketch(Plane(origin=(3.887605660092766, 50, 42.57286720707937), x_dir=(-0.9999873717634292, 0, -0.005025566004865019), z_dir=(0, -1, 0))) as fillet12_piece_3:
        with BuildLine():
            CenterArc((9.354319503246753, -11.944643415577572), FILLET12_R, 95.50552505302706, 70.28590162466459)
            Line((-2.2785840931776087, -8.999214089265854), (0, 0))
            ThreePointArc((0, 0), (4.101509320654338, -0.197207832004895), (8.203018641308686, 0))
        make_face()
    extrude(amount=5)
    with BuildSketch(Plane(origin=(18.358595984534514, 50, 38.60731088118716), x_dir=(0.8599541218076301, 0, -0.5103713436176327), z_dir=(0, -1, 0))) as fillet12_piece_4:
        with BuildLine():
            CenterArc((8.932402267564584, 11.949534715437368), FILLET12_R, 196.7679395306447, 67.97557234102874)
            Line((-2.5573706744401097, 8.487581835749824), (0, 0))
            ThreePointArc((0, 0), (3.9165148403936985, 0.17978257625437336), (7.833029680787395, 4.4e-16))
        make_face()
    extrude(amount=5)
    with BuildSketch(Plane(origin=(-38.81298734332038, 50, -17.91966834199929), x_dir=(0.5043459537102459, 0, -0.8635016844083758), z_dir=(0, -1, 0))) as fillet12_piece_5:
        with BuildLine():
            CenterArc((9.354319503247599, -11.944643415577568), FILLET12_R, 95.50552505302745, 70.28590162466934)
            Line((-2.2785840931770296, -8.999214089266896), (0, 0))
            ThreePointArc((0, 0), (4.101509320654717, -0.19720783200493475), (8.203018641309445, 4e-17))
        make_face()
    extrude(amount=5)
    with BuildSketch(Plane(origin=(-42.61420998717906, 50, -3.404644940167401), x_dir=(0.012017488032744224, 0, 0.9999277873833604), z_dir=(0, -1, 0))) as fillet12_piece_6:
        with BuildLine():
            CenterArc((8.932402267563731, 11.949534715437377), FILLET12_R, 196.76793953064976, 67.97557234102419)
            Line((-2.5573706744406537, 8.487581835748815), (0, 0))
            ThreePointArc((0, 0), (3.916514840393324, 0.17978257625433922), (7.8330296807866535, 0))
        make_face()
    extrude(amount=5)

    # Sketch4 → Cut-Extrude1 (cut, through all)
    with SkipClean():  # the faces are left unmerged after this step: merging them gives an invalid solid
        with BuildSketch(Plane(origin=(0, 0, 0), x_dir=(1, 0, 0), z_dir=(0, 1, 0))):
            with BuildLine():
                Line((-20.534371333159484, 32.86186347661107), (-22.654047056796177, 36.2540537275175))
                ThreePointArc((-22.654047056796177, 36.2540537275175), (-15.123777980482348, 41.552238290206105), (-5.94965002510261, 42.333959647417295))
                Line((-5.94965002510261, 42.333959647417295), (-5.392957621262538, 38.37288737245051))
                ThreePointArc((-5.392957621262538, 38.37288737245051), (-13.25328045326254, 36.41308877904585), (-20.534371333159484, 32.86186347661107))
            make_face()
            with BuildLine():
                Line((38.72639425302094, 1.3523554869533245), (42.72395504659418, 1.4919533859546337))
                ThreePointArc((42.72395504659418, 1.4919533859546337), (43.547182933664175, -7.678543212809822), (39.63710950999994, -16.014431758343253))
                Line((39.63710950999994, -16.014431758343253), (35.92837409173245, -14.51600538467917))
                ThreePointArc((35.92837409173245, -14.51600538467917), (38.16130013954304, -6.728866833518007), (38.72639425302094, 1.3523554869533245))
            make_face()
            with BuildLine():
                Line((-18.192022919861778, -34.2142189635644), (-20.069907989798345, -37.746007113472146))
                ThreePointArc((-20.069907989798345, -37.746007113472146), (-28.423404953182153, -33.873695077396334), (-33.68745948489764, -26.31952788907392))
                Line((-33.68745948489764, -26.31952788907392), (-30.535416470470206, -23.856881987771228))
                ThreePointArc((-30.535416470470206, -23.856881987771228), (-24.908019686280806, -29.6842219455278), (-18.192022919861778, -34.2142189635644))
            make_face()
        extrude(amount=-CUT_EXTRUDE1_DEPTH, mode=Mode.SUBTRACT)


solid = part.part
